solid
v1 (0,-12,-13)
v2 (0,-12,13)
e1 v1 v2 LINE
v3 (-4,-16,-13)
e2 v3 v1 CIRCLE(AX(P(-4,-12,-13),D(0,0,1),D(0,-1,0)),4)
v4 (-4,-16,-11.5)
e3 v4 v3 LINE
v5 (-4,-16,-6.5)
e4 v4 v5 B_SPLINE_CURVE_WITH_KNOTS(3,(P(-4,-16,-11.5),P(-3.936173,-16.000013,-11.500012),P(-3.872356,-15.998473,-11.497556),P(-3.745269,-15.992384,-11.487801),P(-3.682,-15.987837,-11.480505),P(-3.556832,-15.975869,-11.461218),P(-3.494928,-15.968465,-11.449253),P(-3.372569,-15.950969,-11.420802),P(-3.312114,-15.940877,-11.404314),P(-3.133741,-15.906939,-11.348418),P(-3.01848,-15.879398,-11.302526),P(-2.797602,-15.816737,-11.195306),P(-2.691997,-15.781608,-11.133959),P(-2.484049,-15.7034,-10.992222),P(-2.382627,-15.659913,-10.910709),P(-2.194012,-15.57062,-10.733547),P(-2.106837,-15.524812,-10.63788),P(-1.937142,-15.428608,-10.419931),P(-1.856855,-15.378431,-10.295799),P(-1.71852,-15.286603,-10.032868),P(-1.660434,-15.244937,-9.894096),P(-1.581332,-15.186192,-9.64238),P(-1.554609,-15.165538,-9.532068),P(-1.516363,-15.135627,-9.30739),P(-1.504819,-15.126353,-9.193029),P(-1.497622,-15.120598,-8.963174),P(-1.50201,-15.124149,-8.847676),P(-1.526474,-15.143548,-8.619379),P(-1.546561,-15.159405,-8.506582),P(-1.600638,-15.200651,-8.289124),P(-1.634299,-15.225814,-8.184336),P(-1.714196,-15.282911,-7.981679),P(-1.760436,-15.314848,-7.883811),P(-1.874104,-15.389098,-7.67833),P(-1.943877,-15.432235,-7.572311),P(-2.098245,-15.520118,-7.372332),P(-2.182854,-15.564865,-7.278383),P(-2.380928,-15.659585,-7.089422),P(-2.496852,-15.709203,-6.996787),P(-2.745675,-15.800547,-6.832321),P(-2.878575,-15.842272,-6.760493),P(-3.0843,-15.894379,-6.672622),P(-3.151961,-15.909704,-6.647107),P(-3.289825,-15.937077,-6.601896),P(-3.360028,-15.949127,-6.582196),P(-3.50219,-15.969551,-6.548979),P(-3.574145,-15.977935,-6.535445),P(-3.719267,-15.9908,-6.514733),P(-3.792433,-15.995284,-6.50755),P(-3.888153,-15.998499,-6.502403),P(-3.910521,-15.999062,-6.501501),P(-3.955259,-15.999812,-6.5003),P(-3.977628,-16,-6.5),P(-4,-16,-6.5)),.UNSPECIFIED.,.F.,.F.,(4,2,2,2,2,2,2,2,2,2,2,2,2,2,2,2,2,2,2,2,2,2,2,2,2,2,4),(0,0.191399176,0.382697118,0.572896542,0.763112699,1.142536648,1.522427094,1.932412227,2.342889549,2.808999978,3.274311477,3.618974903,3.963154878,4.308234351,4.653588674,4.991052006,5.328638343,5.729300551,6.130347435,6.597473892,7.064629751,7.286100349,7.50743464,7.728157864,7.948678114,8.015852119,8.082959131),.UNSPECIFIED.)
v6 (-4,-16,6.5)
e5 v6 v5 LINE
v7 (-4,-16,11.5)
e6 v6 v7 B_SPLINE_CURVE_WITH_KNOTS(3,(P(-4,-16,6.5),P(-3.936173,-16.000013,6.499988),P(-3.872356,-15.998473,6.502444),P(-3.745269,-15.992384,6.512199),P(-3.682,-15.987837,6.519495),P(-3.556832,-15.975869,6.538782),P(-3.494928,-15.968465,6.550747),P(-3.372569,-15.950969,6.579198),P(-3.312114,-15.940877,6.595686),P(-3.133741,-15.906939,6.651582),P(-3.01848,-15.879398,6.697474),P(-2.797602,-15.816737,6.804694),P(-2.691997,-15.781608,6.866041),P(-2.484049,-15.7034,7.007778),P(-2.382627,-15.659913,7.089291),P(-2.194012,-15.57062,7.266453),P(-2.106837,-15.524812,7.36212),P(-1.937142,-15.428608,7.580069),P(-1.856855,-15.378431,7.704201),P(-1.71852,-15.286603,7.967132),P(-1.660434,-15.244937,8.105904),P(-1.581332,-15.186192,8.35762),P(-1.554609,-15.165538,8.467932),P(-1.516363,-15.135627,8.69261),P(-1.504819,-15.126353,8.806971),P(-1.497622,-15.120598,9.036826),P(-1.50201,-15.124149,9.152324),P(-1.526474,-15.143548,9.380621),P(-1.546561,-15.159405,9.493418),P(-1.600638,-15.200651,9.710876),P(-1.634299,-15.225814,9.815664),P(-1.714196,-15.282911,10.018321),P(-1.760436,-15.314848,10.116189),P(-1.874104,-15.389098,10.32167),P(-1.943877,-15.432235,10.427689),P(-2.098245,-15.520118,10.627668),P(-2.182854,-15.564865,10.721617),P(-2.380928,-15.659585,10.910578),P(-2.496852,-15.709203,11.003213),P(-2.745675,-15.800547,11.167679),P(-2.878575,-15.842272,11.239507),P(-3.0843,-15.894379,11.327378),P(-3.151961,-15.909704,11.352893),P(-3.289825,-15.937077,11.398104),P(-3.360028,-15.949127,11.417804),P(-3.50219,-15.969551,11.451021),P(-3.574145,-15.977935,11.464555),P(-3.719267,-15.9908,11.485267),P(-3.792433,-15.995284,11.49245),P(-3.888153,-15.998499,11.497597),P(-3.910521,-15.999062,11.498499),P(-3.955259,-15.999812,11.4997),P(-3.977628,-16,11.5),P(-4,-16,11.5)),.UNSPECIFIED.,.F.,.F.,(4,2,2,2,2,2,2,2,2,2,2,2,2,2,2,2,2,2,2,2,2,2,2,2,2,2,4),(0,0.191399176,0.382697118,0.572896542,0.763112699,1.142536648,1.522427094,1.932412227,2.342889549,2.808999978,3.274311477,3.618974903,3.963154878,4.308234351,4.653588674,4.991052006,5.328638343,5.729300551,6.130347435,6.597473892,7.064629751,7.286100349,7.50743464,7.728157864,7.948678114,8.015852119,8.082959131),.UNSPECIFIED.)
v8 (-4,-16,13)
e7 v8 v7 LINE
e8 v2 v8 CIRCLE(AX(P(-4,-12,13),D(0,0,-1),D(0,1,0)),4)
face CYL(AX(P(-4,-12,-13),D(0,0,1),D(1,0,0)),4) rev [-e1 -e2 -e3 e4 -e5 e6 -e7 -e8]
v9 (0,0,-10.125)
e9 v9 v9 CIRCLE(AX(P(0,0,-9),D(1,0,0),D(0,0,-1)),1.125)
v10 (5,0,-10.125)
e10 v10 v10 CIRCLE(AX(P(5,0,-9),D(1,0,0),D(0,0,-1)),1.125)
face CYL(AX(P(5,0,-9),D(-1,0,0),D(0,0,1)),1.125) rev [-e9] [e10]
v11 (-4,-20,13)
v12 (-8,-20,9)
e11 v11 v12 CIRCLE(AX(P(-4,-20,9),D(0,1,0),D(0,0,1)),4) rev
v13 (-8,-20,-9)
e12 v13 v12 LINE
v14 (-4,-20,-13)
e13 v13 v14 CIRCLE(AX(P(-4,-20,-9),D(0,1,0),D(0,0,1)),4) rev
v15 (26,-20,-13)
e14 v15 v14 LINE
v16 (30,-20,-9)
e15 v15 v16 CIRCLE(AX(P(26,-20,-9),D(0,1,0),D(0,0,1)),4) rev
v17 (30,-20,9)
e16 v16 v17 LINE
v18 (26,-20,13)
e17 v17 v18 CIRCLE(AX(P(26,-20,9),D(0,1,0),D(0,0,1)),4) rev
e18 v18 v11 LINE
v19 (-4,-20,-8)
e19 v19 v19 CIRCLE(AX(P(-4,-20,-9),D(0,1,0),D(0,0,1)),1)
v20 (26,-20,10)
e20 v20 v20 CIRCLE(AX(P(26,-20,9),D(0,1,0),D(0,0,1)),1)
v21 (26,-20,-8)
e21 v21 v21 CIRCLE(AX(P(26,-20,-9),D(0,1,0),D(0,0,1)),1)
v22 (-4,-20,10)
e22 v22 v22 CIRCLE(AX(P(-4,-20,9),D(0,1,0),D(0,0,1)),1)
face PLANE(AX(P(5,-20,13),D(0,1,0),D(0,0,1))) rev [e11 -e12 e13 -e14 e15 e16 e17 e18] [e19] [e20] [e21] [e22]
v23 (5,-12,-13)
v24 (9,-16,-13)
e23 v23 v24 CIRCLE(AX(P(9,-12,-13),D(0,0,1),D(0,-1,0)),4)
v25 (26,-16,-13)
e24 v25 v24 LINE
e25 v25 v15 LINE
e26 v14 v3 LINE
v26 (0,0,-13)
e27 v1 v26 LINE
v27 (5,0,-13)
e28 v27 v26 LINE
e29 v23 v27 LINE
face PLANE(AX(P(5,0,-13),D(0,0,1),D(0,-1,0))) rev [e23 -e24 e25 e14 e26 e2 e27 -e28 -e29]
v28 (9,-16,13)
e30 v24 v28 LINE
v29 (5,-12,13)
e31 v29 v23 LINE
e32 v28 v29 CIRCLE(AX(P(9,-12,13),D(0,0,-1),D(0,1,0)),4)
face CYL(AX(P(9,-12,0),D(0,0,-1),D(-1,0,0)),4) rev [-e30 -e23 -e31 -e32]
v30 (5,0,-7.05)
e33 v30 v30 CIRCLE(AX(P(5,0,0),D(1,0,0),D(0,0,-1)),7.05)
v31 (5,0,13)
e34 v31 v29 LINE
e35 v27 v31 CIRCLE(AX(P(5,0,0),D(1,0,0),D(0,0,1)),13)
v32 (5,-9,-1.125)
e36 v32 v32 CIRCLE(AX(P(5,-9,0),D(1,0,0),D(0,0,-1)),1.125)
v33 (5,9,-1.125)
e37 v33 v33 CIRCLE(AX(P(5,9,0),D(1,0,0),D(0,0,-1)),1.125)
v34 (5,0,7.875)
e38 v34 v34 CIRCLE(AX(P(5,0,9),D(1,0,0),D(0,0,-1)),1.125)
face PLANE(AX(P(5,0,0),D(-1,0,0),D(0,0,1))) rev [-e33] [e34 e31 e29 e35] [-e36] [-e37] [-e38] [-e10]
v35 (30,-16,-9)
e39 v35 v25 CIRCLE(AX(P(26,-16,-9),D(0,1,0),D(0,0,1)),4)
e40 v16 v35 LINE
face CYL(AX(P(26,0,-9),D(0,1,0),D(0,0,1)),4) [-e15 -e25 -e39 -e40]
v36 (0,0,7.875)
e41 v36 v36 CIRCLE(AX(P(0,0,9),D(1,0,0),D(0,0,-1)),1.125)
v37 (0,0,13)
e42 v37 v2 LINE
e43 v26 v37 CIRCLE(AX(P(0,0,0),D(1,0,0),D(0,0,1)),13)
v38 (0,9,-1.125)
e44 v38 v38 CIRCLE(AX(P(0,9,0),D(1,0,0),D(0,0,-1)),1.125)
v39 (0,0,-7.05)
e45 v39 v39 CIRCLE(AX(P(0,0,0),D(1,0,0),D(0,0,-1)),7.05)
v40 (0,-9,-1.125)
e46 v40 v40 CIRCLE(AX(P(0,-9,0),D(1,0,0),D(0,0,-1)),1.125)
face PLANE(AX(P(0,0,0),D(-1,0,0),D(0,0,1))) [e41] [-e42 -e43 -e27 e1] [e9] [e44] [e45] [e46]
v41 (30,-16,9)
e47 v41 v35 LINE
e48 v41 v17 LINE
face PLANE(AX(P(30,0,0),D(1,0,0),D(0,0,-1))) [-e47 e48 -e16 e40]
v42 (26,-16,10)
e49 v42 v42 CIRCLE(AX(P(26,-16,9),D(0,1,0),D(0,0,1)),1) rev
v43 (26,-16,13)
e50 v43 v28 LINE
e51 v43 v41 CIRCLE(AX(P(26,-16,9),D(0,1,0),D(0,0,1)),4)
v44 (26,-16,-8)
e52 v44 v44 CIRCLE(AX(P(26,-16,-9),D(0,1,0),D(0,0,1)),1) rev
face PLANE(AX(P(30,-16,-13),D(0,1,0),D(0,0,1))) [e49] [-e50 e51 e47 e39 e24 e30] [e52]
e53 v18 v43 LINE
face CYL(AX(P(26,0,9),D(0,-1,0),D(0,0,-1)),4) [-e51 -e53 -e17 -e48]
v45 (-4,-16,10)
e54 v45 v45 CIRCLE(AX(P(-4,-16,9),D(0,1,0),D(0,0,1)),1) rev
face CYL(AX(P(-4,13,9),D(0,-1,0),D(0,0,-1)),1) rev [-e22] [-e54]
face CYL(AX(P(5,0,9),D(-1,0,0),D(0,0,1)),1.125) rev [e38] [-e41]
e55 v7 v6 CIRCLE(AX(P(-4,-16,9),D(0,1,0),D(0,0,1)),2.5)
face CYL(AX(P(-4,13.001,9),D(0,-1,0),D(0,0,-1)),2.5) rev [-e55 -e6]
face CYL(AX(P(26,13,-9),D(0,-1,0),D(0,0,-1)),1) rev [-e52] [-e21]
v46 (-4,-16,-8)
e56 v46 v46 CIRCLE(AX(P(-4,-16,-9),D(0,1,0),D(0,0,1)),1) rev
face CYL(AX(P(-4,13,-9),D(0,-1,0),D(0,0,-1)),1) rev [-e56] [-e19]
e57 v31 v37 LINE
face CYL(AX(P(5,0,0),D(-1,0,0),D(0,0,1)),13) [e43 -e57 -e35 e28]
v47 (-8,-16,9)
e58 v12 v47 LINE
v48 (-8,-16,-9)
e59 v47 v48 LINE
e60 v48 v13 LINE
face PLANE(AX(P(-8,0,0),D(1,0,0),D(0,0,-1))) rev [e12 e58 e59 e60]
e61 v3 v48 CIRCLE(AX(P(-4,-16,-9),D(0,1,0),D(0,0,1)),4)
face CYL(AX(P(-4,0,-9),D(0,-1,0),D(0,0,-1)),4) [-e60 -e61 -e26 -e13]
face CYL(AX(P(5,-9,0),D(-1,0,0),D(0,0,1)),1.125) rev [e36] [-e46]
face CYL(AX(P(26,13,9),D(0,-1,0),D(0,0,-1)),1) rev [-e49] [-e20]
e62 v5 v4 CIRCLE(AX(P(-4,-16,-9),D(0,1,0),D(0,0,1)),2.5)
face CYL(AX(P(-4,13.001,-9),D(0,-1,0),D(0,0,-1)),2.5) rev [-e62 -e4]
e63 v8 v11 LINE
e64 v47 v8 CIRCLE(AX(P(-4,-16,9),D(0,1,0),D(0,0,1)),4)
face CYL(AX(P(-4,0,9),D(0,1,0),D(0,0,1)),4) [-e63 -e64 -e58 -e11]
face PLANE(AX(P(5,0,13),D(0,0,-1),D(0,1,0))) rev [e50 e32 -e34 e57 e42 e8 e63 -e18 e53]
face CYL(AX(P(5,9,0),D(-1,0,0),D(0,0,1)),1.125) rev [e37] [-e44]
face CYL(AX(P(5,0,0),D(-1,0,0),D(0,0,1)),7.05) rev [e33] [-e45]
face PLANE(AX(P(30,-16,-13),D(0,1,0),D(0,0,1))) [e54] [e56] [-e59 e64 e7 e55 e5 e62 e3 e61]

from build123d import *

# Parameters (mm, degrees)
SKETCH1_R                = 1.125
SKETCH1_R_2              = 7.05
BOSS_EXTRUDE1_DEPTH      = 5
BOSS_EXTRUDE2_DEPTH      = 8
BOSS_EXTRUDE2_DEPTH_BACK = 30
SKETCH2_W                = 26
SKETCH2_H                = 4
FILLET1_R                = 4
FILLET2_R                = 4
CUT_EXTRUDE1_DEPTH       = 44.703546767
CUT_EXTRUDE1_DEPTH_BACK  = 44.703546767
SKETCH3_R                = 1
CUT_EXTRUDE3_OUTLINE_R   = 1
CUT_EXTRUDE3_DEPTH       = 4.0000001


with BuildPart() as part:
    # Sketch1 → Boss-Extrude1 (new body)
    with BuildSketch(Plane(origin=(0, 0, 0), x_dir=(0, 0, -1), z_dir=(1, 0, 0))):
        with BuildLine():
            Line((-13, 0), (-13, -20))
            Line((-13, -20), (13, -20))
            Line((13, -20), (13, 0))
            ThreePointArc((13, 0), (0, 13), (-13, 0))
        make_face()
        with Locations((0, 9)):
            Circle(SKETCH1_R, mode=Mode.SUBTRACT)
        with Locations((9, 0)):
            Circle(SKETCH1_R, mode=Mode.SUBTRACT)
        with Locations((0, -9)):
            Circle(SKETCH1_R, mode=Mode.SUBTRACT)
        with Locations((-9, 0)):
            Circle(SKETCH1_R, mode=Mode.SUBTRACT)
        Circle(SKETCH1_R_2, mode=Mode.SUBTRACT)
    extrude(amount=BOSS_EXTRUDE1_DEPTH)

    # Sketch2 → Boss-Extrude2 (add, two sides: drawn at the far end of the back side and taken through both)
    with BuildSketch(Plane.ZY.offset(-BOSS_EXTRUDE2_DEPTH_BACK)):
        with Locations((0, -18)):
            Rectangle(SKETCH2_W, SKETCH2_H)
    extrude(amount=BOSS_EXTRUDE2_DEPTH + BOSS_EXTRUDE2_DEPTH_BACK)

    # Fillet1
    fillet1_edges = [part.edges().sort_by_distance(p)[0] for p in [
        (5, -16, 0),
        (0, -16, 0),
    ]]
    fillet(fillet1_edges, radius=FILLET1_R)

    # Fillet2
    fillet2_edges = [part.edges().sort_by_distance(p)[0] for p in [
        (30, -18, -13),
        (30, -18, 13),
        (-8, -18, -13),
        (-8, -18, 13),
    ]]
    fillet(fillet2_edges, radius=FILLET2_R)

    # Sketch3 → Cut-Extrude1 (cut, two sides: drawn at the far end of the back side and taken through both)
    with BuildSketch(Plane(origin=(0, -16, 0), x_dir=(1, 0, 0), z_dir=(0, 1, 0)).offset(-CUT_EXTRUDE1_DEPTH_BACK)):
        with Locations(Location((-4, -9, 0), (0, 0, 270.000000003))):
            Circle(SKETCH3_R)
        with Locations(Location((-4, 9, 0), (0, 0, 270.000000003))):
            Circle(SKETCH3_R)
        with Locations(Location((26, 9, 0), (0, 0, 270))):
            Circle(SKETCH3_R)
        with Locations(Location((26, -9, 0), (0, 0, 270))):
            Circle(SKETCH3_R)
    extrude(amount=CUT_EXTRUDE1_DEPTH + CUT_EXTRUDE1_DEPTH_BACK, mode=Mode.SUBTRACT)

    # Cut-Extrude3: read off the stored shape, not the designer's step
    # Cut-Extrude3 outline → Cut-Extrude3 (cut)
    with BuildSketch(Plane(origin=(0, -16, 0), x_dir=(1, 0, 0), z_dir=(0, 1, 0))):
        with BuildLine():
            Line((-4, -6.5), (-4, 6.5))
            ThreePointArc((-4, 6.5), (-1.5, 9), (-4, 11.5))
            Line((-4, 11.5), (-4, 13))
            ThreePointArc((-4, 13), (-6.828427125, 11.828427125), (-8, 9))
            Line((-8, 9), (-8, -9))
            ThreePointArc((-8, -9), (-6.828427125, -11.828427125), (-4, -13))
            Line((-4, -13), (-4, -11.5))
            ThreePointArc((-4, -11.5), (-1.5, -9), (-4, -6.5))
        make_face()
        with Locations((-4, -9)):
            Circle(CUT_EXTRUDE3_OUTLINE_R, mode=Mode.SUBTRACT)
        with Locations((-4, 9)):
            Circle(CUT_EXTRUDE3_OUTLINE_R, mode=Mode.SUBTRACT)
    extrude(amount=CUT_EXTRUDE3_DEPTH, mode=Mode.SUBTRACT)


solid = part.part
